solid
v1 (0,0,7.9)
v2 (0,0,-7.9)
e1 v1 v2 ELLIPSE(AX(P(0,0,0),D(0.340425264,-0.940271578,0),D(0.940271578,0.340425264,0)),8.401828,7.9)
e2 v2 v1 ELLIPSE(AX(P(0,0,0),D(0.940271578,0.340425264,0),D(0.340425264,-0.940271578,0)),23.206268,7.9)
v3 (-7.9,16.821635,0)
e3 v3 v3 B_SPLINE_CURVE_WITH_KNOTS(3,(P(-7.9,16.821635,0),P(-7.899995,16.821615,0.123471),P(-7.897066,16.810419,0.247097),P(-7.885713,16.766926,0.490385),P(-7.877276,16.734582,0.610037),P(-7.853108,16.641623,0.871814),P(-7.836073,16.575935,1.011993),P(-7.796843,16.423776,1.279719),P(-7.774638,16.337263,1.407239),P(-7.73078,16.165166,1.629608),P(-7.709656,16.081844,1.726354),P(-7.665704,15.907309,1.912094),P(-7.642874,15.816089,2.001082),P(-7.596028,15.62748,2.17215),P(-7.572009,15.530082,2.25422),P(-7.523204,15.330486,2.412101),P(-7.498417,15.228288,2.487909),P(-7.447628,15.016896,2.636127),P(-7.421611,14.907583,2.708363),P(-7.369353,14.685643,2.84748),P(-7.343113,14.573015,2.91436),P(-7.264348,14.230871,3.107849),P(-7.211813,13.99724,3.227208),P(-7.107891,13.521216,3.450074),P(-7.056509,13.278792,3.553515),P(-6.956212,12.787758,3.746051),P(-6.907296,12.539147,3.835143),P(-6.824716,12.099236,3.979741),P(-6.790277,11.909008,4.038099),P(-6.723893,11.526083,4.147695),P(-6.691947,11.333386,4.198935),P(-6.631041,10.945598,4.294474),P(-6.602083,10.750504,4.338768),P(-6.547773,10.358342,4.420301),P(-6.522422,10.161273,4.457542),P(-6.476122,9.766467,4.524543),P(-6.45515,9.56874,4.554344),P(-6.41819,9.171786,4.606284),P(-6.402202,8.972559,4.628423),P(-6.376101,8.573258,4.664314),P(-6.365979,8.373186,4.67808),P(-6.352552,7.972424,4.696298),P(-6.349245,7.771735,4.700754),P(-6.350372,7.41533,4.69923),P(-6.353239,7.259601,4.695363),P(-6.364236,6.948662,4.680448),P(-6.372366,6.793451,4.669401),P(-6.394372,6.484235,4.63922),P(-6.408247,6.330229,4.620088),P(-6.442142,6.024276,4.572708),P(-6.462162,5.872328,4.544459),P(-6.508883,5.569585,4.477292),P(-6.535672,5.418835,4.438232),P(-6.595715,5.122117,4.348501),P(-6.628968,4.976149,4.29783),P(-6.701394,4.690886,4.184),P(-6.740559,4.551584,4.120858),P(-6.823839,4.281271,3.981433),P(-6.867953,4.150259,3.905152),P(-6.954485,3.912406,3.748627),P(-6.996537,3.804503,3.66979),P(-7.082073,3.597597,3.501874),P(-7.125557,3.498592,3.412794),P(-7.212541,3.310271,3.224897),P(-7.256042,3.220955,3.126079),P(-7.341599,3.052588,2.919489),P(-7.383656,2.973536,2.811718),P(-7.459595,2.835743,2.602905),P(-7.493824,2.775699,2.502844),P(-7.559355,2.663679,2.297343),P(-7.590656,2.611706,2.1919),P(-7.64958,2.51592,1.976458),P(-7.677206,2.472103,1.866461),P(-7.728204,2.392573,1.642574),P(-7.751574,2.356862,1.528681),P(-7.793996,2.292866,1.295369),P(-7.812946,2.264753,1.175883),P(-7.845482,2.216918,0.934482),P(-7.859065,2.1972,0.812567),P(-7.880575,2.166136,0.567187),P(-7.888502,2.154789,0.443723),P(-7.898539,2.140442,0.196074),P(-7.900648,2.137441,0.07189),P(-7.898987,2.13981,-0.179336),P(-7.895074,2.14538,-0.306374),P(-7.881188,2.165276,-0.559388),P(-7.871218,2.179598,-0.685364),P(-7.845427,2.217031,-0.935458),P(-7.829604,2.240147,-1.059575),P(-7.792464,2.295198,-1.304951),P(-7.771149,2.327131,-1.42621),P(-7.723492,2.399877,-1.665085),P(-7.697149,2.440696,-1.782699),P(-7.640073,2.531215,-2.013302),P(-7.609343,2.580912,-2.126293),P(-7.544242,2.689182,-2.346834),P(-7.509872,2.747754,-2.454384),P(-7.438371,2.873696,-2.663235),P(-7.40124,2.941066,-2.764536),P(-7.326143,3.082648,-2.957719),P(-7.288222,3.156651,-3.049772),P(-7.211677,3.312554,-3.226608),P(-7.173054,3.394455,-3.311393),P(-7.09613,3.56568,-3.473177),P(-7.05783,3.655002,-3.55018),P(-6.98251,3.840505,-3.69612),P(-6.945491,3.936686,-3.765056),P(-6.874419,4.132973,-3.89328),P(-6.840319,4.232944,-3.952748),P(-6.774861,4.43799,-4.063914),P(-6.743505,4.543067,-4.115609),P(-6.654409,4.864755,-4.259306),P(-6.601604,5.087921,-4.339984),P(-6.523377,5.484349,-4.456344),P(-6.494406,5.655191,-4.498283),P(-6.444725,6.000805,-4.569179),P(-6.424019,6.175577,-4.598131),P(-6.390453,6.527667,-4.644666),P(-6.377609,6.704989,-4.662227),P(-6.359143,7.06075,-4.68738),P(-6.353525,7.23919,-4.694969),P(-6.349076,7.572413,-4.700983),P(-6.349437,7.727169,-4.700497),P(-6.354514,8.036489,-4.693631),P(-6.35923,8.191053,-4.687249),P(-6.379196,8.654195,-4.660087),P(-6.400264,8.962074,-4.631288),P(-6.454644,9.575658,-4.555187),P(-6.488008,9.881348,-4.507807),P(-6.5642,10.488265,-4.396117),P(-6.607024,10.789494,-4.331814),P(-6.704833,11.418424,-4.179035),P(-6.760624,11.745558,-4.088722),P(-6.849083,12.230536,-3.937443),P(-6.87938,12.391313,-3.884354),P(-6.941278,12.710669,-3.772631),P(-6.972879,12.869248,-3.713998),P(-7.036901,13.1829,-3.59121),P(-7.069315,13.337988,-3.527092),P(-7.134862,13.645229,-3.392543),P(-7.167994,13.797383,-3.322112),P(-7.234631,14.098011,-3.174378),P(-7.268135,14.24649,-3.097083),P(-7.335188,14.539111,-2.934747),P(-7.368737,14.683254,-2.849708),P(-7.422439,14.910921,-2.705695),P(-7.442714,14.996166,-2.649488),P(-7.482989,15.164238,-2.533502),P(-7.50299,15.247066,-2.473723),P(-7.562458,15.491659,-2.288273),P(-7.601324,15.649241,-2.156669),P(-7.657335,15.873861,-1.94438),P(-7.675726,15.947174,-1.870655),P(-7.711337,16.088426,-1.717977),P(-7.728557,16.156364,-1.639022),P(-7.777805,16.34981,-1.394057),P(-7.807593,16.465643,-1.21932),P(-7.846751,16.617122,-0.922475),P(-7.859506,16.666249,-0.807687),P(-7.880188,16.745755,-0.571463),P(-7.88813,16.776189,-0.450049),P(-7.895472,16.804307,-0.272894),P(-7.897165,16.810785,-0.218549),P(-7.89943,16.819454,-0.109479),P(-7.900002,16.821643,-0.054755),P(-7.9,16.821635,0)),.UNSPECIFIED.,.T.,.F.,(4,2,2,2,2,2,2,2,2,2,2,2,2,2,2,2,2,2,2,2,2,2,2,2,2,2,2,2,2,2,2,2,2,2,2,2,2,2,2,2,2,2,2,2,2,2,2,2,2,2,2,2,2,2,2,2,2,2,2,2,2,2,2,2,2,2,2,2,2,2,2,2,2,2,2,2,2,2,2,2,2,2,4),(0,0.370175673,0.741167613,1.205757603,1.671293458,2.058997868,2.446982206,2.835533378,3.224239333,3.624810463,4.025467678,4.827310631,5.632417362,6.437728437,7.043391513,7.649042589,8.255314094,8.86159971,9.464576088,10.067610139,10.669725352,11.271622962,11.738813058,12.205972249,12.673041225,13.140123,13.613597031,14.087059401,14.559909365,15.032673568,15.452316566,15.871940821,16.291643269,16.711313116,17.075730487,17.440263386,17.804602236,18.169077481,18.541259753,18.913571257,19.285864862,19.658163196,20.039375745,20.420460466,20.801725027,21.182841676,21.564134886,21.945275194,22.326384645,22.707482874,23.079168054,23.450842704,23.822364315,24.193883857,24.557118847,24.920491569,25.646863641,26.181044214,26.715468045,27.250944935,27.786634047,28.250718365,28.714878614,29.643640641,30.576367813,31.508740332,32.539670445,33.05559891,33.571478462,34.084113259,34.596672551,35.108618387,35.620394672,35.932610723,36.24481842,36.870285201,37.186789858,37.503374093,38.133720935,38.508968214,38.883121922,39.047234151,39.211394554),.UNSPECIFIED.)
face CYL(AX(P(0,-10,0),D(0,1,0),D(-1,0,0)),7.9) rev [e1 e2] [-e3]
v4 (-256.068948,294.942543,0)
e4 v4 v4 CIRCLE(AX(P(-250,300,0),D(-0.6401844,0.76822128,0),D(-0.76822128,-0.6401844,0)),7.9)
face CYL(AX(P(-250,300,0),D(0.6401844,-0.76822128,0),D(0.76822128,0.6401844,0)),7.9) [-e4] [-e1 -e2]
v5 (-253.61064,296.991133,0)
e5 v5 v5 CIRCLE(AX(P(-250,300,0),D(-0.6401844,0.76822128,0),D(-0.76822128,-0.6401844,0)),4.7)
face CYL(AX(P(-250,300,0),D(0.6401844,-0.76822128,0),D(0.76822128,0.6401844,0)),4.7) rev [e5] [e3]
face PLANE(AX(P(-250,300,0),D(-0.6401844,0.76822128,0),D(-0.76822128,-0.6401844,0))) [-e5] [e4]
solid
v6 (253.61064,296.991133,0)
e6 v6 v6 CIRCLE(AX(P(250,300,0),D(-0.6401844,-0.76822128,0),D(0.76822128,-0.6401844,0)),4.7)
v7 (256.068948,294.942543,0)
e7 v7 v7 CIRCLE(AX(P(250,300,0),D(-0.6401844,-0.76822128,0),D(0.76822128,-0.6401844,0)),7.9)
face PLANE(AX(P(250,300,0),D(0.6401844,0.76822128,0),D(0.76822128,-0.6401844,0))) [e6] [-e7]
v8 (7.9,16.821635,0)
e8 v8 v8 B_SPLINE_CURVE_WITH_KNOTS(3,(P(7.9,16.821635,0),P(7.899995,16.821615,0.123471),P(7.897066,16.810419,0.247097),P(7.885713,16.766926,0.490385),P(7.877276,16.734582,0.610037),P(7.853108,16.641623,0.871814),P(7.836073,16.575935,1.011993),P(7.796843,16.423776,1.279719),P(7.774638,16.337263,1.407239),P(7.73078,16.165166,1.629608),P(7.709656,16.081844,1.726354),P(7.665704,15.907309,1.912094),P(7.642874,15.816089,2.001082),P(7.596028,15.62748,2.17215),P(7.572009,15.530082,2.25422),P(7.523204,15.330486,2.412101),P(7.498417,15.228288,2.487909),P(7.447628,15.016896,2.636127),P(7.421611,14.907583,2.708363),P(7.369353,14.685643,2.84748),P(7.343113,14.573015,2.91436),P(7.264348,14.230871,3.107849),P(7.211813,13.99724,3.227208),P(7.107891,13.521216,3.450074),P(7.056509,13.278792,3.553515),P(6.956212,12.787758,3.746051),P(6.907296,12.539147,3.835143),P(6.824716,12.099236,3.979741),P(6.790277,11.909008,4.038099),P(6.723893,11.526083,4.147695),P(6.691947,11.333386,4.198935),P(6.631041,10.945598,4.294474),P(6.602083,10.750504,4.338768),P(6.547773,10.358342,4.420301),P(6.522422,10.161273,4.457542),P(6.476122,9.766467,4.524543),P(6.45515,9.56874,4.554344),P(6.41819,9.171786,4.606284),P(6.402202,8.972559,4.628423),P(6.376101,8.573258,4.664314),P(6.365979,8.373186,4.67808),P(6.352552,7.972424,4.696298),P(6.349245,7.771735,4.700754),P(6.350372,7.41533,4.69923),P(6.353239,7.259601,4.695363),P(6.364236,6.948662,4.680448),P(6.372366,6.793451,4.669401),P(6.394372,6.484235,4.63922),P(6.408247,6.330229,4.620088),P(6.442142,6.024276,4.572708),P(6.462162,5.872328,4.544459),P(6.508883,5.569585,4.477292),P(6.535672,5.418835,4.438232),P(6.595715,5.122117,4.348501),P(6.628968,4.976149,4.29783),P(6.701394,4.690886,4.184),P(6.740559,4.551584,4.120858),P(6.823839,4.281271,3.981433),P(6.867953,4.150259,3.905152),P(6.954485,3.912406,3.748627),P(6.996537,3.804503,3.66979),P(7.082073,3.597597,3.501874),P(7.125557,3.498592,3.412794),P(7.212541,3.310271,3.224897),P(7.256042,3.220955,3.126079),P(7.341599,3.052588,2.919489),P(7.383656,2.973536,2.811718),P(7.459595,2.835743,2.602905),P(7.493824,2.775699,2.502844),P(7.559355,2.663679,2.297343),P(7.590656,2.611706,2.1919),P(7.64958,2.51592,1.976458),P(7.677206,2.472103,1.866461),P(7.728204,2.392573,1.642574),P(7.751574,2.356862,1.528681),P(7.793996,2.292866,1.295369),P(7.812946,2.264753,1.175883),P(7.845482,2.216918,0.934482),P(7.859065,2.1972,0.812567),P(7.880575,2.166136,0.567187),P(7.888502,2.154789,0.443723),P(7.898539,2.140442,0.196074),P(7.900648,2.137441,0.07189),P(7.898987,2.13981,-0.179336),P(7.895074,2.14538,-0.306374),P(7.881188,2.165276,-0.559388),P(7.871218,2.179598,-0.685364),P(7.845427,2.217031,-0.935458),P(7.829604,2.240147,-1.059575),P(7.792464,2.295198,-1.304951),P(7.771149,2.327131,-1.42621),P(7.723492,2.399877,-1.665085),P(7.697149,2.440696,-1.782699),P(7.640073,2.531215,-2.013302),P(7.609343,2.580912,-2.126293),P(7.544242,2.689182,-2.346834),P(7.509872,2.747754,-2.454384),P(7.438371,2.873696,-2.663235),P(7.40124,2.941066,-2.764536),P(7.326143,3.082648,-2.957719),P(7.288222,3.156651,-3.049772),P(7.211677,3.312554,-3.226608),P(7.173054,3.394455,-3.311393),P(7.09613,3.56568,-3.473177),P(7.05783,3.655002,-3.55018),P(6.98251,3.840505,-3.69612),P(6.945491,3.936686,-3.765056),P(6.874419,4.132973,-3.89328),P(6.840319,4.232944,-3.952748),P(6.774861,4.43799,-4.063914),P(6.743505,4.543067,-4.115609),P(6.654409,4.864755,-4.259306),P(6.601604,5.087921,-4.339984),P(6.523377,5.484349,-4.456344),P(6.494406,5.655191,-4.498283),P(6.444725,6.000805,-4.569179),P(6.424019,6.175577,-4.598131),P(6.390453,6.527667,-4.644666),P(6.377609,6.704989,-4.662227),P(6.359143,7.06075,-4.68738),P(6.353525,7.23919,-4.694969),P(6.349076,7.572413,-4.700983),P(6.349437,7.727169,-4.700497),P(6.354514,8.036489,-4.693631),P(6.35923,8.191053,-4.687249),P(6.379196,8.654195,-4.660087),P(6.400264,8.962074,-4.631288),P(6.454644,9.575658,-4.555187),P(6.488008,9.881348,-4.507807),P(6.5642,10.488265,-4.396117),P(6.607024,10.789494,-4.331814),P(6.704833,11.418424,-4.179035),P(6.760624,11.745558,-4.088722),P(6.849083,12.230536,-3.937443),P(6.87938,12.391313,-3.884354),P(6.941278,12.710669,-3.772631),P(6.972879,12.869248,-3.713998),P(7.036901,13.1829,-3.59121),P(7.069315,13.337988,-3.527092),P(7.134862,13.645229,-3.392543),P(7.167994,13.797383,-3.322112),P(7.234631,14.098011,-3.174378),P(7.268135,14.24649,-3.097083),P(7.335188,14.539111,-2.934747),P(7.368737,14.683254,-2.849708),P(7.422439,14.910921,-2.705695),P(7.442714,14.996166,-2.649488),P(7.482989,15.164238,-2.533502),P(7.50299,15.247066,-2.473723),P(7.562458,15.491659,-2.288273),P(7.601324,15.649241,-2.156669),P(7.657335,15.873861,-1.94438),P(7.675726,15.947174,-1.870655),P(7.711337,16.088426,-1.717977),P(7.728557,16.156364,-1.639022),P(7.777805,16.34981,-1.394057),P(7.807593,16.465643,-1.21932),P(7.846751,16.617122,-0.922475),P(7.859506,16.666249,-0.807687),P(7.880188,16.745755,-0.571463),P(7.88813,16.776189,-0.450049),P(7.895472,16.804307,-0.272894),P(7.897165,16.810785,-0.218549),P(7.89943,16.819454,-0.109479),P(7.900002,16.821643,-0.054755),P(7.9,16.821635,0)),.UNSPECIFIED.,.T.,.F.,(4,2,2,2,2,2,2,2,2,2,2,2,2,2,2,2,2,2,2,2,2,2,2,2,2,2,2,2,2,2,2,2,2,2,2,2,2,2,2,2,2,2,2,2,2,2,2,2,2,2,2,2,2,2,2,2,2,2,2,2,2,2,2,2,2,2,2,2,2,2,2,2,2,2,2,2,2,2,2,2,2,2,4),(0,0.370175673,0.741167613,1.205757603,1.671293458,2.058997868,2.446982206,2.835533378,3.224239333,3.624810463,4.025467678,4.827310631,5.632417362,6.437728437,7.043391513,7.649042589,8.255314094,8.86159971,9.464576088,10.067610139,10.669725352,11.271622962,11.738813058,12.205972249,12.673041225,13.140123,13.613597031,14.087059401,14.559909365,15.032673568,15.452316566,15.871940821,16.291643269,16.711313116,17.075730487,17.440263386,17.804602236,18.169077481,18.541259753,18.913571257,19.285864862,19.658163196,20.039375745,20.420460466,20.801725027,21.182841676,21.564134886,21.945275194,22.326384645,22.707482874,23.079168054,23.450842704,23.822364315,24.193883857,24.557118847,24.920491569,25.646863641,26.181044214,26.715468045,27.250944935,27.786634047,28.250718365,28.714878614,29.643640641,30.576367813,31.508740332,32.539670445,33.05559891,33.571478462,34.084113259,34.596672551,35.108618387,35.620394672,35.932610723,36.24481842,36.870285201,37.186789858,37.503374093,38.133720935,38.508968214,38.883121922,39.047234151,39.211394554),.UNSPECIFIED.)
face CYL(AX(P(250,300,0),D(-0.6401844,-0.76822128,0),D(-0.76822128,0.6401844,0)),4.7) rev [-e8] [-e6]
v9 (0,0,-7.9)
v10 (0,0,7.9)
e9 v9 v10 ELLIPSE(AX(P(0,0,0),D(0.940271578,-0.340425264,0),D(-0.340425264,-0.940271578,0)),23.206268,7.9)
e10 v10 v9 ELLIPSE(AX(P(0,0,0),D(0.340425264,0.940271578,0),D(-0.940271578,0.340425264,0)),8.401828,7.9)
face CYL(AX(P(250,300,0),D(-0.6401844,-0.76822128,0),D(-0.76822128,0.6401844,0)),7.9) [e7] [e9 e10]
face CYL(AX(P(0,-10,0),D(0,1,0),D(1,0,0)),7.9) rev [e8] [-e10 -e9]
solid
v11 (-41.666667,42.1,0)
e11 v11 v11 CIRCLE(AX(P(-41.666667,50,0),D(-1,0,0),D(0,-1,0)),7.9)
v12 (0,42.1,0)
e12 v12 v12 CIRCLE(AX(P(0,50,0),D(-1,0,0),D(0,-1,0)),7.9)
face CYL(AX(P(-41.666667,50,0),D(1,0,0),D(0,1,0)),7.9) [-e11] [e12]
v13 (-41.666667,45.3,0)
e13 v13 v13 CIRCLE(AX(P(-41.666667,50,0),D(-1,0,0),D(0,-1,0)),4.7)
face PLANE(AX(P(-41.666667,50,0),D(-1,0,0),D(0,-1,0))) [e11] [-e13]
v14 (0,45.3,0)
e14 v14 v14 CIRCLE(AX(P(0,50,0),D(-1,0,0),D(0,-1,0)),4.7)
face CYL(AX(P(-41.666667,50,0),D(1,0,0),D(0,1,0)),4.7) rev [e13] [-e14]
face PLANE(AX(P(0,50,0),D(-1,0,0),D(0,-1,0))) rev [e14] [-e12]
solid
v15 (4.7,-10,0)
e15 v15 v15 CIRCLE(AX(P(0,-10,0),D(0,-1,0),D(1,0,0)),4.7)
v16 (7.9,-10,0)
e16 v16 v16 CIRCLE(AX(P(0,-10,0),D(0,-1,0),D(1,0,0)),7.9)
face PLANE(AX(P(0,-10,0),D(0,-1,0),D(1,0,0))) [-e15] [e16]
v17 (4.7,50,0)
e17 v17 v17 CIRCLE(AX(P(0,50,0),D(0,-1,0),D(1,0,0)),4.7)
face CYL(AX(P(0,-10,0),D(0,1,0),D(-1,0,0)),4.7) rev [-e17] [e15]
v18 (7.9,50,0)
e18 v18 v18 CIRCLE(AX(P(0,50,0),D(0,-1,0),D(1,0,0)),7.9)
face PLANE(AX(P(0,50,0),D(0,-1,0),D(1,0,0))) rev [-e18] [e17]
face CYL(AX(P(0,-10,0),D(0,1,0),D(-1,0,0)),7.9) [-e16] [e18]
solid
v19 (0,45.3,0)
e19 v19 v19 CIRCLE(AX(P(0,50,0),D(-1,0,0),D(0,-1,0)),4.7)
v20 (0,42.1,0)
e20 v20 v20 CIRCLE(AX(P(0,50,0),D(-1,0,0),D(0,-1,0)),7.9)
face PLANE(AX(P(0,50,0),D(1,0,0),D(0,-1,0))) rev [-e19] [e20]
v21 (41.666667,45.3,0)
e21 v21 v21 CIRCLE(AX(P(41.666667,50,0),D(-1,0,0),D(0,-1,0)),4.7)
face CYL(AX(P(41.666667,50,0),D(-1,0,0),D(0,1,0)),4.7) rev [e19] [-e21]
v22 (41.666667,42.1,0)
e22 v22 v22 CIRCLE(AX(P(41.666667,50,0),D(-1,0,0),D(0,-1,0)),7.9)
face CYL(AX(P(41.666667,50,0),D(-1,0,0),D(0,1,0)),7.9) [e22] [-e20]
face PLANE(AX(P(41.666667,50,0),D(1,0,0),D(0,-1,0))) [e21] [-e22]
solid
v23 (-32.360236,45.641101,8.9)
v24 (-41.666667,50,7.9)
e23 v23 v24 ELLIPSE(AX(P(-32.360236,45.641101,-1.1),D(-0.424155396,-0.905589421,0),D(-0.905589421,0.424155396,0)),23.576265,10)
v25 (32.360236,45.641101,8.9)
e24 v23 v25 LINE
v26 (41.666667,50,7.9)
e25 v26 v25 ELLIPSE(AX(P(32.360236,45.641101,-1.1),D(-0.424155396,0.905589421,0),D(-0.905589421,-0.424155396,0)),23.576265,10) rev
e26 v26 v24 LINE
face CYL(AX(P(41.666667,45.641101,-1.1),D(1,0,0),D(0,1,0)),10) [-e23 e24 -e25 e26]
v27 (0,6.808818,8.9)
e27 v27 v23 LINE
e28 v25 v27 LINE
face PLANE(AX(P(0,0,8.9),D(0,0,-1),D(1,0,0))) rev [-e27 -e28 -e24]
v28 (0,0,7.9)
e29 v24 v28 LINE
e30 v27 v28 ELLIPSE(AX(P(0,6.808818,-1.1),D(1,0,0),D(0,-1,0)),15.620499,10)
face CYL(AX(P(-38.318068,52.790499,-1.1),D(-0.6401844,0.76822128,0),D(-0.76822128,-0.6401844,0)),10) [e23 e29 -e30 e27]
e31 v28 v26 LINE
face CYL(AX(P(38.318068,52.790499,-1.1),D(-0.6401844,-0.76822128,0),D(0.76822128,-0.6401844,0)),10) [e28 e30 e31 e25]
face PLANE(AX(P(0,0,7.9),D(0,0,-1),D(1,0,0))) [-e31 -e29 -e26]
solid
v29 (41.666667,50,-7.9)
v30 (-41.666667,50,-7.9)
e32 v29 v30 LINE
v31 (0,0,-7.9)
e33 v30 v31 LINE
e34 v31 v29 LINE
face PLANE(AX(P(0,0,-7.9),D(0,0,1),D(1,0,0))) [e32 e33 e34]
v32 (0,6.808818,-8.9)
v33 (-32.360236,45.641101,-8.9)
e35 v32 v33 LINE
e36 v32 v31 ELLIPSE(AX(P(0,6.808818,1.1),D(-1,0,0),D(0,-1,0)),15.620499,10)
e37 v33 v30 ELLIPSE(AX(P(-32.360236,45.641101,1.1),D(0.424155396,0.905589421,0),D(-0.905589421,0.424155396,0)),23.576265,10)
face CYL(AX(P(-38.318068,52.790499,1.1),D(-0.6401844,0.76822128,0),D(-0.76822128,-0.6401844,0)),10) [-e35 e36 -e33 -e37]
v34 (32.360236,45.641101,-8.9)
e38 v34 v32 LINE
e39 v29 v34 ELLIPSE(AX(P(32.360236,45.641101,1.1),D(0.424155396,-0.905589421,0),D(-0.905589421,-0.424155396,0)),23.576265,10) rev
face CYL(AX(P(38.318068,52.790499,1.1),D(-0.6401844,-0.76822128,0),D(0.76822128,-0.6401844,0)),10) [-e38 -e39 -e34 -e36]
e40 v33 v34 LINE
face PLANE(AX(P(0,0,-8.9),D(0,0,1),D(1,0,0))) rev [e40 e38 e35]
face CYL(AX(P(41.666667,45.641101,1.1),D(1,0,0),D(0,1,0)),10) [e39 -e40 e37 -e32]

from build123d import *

# Parameters (mm, degrees)
FSAE_START                         = -390.512483795
FSAE_TUBE_15_8X3_2_4_OUTLINE_R     = 7.9
FSAE_TUBE_15_8X3_2_4_OUTLINE_R_2   = 4.7
FSAE_TUBE_15_8X3_2_4_DEPTH         = 390.512483895
FSAE_START_2                       = -6
FSAE_TUBE_15_8X3_2_4_2_DEPTH       = 29
FSAE_START_3                       = -10
FSAE_TUBE_15_8X3_2_4_3_OUTLINE_R   = 7.9
FSAE_TUBE_15_8X3_2_4_3_OUTLINE_R_2 = 4.7
FSAE_TUBE_15_8X3_2_4_3_DEPTH       = 60
SKETCH14_R                         = 7.9
SKETCH14_R_2                       = 4.7
FSAE_TUBE_15_8X3_2_5_DEPTH         = 41.666666667
MIRROR2_ANGLE                      = 180
MIRROR2_2_ANGLE                    = 180
BOSS_EXTRUDE2_DEPTH                = 1
FILLET1_R                          = 10


with BuildPart() as part:
    # Fsae tube 15.8X3.2(4): read off the stored shape, not the designer's step
    # Fsae tube 15.8X3.2(4) outline → Fsae tube 15.8X3.2(4) (new body)
    with BuildSketch(Plane(origin=(0, 0, 0), x_dir=(0.7682212795973756, 0.6401843996644802, 0), z_dir=(0.64018439966448, -0.7682212795973759, 0)).offset(FSAE_START)):
        Circle(FSAE_TUBE_15_8X3_2_4_OUTLINE_R)
        Circle(FSAE_TUBE_15_8X3_2_4_OUTLINE_R_2, mode=Mode.SUBTRACT)
    extrude(amount=FSAE_TUBE_15_8X3_2_4_DEPTH)

    # Fsae tube 15.8X3.2_4 2 outline → Fsae tube 15.8X3.2_4 2 (cut)
    with BuildSketch(Plane(origin=(0, 0, 0), x_dir=(1, 0, 0), z_dir=(0, 1, 0)).offset(FSAE_START_2)):
        with BuildLine():
            Line((8, 7.9), (0, 7.9))
            ThreePointArc((0, 7.9), (-7.9, 0), (0, -7.9))
            Line((0, -7.9), (8, -7.9))
            Line((8, -7.9), (8, 7.9))
        make_face()
    extrude(amount=FSAE_TUBE_15_8X3_2_4_2_DEPTH, mode=Mode.SUBTRACT)


with BuildPart() as body_2:
    # Fsae tube 15.8X3.2_4 3 outline → Fsae tube 15.8X3.2_4 3 (new body)
    with BuildSketch(Plane(origin=(0, 0, 0), x_dir=(1, 0, 0), z_dir=(0, 1, 0)).offset(FSAE_START_3)):
        Circle(FSAE_TUBE_15_8X3_2_4_3_OUTLINE_R)
        Circle(FSAE_TUBE_15_8X3_2_4_3_OUTLINE_R_2, mode=Mode.SUBTRACT)
    extrude(amount=FSAE_TUBE_15_8X3_2_4_3_DEPTH)


with BuildPart() as body_3:
    # Sketch14 → Fsae tube 15.8X3.2(5) (new body)
    with BuildSketch(Plane(origin=(0, 50, 0), x_dir=(0, -1, 0), z_dir=(-1, 0, 0))):
        Circle(SKETCH14_R)
        Circle(SKETCH14_R_2, mode=Mode.SUBTRACT)
    extrude(amount=FSAE_TUBE_15_8X3_2_5_DEPTH)


with BuildPart() as body_4:
    # Mirror2: read off the stored shape, not the designer's step
    # Mirror2: copy of body 3
    add(body_3.part.rotate(Axis((0, 0, 0), (0, 1, 0)), MIRROR2_ANGLE))


with BuildPart() as body_5:
    # Mirror2 2: copy of part
    add(part.part.rotate(Axis((0, 0, 0), (0, 1, 0)), MIRROR2_2_ANGLE))


with BuildPart() as body_6:
    # Sketch15 → Boss-Extrude2 (new body)
    with BuildSketch(Plane.XY.offset(-7.9)):
        Polygon((-41.666666667, 50), (0, 0), (41.666666667, 50), align=None)
    extrude(amount=-BOSS_EXTRUDE2_DEPTH)

    # Fillet1
    # the kernel refuses this fillet: 10 mm, written as the material it takes off along each edge
    with BuildSketch(Plane(origin=(52.563914026, 50, -8.9), x_dir=(0, 0, 1), z_dir=(-1, 0, 0))) as fillet1_piece_1:
        with BuildLine():
            CenterArc((10, -4.358898944), FILLET1_R, 154.158067237, 25.841932763)
            Line((0, -4.358898944), (-0.2, -4.358898944))
            Line((-0.2, -4.358898944), (-0.2, 0))
            Line((-0.2, 0), (0, 0.2))
            ThreePointArc((0, 0.2), (0.5, 0.2), (0.82, 0.087177979))
            Line((0.82, 0.087177979), (1, 0))
        make_face()
    extrude(amount=105.127828051, mode=Mode.SUBTRACT)
    with BuildSketch(Plane(origin=(-48.642914425, 58.37149731, -8.9), x_dir=(0, 0, 1), z_dir=(0.6401843996644797, -0.768221279597376, 0)), Plane(origin=(-6.976247758, -8.37149731, -8.9), x_dir=(0, 0, 1), z_dir=(0.64018439966448, 0.7682212795973759, 0))) as fillet1_piece_2:
        with BuildLine():
            CenterArc((10, -4.358898944), FILLET1_R, 154.158067237, 25.841932763)
            Line((0, -4.358898944), (-0.2, -4.358898944))
            Line((-0.2, -4.358898944), (-0.2, 0))
            Line((-0.2, 0), (0, 0.2))
            ThreePointArc((0, 0.2), (0.5, 0.2), (0.82, 0.087177979))
            Line((0.82, 0.087177979), (1, 0))
        make_face()
    extrude(amount=86.879908684, mode=Mode.SUBTRACT)


with BuildPart() as body_7:
    # Mirror3: mirrored copy
    add(body_6.part.mirror(Plane.XY))


solid = Compound([part.part, body_2.part, body_3.part, body_4.part, body_5.part, body_6.part, body_7.part])
